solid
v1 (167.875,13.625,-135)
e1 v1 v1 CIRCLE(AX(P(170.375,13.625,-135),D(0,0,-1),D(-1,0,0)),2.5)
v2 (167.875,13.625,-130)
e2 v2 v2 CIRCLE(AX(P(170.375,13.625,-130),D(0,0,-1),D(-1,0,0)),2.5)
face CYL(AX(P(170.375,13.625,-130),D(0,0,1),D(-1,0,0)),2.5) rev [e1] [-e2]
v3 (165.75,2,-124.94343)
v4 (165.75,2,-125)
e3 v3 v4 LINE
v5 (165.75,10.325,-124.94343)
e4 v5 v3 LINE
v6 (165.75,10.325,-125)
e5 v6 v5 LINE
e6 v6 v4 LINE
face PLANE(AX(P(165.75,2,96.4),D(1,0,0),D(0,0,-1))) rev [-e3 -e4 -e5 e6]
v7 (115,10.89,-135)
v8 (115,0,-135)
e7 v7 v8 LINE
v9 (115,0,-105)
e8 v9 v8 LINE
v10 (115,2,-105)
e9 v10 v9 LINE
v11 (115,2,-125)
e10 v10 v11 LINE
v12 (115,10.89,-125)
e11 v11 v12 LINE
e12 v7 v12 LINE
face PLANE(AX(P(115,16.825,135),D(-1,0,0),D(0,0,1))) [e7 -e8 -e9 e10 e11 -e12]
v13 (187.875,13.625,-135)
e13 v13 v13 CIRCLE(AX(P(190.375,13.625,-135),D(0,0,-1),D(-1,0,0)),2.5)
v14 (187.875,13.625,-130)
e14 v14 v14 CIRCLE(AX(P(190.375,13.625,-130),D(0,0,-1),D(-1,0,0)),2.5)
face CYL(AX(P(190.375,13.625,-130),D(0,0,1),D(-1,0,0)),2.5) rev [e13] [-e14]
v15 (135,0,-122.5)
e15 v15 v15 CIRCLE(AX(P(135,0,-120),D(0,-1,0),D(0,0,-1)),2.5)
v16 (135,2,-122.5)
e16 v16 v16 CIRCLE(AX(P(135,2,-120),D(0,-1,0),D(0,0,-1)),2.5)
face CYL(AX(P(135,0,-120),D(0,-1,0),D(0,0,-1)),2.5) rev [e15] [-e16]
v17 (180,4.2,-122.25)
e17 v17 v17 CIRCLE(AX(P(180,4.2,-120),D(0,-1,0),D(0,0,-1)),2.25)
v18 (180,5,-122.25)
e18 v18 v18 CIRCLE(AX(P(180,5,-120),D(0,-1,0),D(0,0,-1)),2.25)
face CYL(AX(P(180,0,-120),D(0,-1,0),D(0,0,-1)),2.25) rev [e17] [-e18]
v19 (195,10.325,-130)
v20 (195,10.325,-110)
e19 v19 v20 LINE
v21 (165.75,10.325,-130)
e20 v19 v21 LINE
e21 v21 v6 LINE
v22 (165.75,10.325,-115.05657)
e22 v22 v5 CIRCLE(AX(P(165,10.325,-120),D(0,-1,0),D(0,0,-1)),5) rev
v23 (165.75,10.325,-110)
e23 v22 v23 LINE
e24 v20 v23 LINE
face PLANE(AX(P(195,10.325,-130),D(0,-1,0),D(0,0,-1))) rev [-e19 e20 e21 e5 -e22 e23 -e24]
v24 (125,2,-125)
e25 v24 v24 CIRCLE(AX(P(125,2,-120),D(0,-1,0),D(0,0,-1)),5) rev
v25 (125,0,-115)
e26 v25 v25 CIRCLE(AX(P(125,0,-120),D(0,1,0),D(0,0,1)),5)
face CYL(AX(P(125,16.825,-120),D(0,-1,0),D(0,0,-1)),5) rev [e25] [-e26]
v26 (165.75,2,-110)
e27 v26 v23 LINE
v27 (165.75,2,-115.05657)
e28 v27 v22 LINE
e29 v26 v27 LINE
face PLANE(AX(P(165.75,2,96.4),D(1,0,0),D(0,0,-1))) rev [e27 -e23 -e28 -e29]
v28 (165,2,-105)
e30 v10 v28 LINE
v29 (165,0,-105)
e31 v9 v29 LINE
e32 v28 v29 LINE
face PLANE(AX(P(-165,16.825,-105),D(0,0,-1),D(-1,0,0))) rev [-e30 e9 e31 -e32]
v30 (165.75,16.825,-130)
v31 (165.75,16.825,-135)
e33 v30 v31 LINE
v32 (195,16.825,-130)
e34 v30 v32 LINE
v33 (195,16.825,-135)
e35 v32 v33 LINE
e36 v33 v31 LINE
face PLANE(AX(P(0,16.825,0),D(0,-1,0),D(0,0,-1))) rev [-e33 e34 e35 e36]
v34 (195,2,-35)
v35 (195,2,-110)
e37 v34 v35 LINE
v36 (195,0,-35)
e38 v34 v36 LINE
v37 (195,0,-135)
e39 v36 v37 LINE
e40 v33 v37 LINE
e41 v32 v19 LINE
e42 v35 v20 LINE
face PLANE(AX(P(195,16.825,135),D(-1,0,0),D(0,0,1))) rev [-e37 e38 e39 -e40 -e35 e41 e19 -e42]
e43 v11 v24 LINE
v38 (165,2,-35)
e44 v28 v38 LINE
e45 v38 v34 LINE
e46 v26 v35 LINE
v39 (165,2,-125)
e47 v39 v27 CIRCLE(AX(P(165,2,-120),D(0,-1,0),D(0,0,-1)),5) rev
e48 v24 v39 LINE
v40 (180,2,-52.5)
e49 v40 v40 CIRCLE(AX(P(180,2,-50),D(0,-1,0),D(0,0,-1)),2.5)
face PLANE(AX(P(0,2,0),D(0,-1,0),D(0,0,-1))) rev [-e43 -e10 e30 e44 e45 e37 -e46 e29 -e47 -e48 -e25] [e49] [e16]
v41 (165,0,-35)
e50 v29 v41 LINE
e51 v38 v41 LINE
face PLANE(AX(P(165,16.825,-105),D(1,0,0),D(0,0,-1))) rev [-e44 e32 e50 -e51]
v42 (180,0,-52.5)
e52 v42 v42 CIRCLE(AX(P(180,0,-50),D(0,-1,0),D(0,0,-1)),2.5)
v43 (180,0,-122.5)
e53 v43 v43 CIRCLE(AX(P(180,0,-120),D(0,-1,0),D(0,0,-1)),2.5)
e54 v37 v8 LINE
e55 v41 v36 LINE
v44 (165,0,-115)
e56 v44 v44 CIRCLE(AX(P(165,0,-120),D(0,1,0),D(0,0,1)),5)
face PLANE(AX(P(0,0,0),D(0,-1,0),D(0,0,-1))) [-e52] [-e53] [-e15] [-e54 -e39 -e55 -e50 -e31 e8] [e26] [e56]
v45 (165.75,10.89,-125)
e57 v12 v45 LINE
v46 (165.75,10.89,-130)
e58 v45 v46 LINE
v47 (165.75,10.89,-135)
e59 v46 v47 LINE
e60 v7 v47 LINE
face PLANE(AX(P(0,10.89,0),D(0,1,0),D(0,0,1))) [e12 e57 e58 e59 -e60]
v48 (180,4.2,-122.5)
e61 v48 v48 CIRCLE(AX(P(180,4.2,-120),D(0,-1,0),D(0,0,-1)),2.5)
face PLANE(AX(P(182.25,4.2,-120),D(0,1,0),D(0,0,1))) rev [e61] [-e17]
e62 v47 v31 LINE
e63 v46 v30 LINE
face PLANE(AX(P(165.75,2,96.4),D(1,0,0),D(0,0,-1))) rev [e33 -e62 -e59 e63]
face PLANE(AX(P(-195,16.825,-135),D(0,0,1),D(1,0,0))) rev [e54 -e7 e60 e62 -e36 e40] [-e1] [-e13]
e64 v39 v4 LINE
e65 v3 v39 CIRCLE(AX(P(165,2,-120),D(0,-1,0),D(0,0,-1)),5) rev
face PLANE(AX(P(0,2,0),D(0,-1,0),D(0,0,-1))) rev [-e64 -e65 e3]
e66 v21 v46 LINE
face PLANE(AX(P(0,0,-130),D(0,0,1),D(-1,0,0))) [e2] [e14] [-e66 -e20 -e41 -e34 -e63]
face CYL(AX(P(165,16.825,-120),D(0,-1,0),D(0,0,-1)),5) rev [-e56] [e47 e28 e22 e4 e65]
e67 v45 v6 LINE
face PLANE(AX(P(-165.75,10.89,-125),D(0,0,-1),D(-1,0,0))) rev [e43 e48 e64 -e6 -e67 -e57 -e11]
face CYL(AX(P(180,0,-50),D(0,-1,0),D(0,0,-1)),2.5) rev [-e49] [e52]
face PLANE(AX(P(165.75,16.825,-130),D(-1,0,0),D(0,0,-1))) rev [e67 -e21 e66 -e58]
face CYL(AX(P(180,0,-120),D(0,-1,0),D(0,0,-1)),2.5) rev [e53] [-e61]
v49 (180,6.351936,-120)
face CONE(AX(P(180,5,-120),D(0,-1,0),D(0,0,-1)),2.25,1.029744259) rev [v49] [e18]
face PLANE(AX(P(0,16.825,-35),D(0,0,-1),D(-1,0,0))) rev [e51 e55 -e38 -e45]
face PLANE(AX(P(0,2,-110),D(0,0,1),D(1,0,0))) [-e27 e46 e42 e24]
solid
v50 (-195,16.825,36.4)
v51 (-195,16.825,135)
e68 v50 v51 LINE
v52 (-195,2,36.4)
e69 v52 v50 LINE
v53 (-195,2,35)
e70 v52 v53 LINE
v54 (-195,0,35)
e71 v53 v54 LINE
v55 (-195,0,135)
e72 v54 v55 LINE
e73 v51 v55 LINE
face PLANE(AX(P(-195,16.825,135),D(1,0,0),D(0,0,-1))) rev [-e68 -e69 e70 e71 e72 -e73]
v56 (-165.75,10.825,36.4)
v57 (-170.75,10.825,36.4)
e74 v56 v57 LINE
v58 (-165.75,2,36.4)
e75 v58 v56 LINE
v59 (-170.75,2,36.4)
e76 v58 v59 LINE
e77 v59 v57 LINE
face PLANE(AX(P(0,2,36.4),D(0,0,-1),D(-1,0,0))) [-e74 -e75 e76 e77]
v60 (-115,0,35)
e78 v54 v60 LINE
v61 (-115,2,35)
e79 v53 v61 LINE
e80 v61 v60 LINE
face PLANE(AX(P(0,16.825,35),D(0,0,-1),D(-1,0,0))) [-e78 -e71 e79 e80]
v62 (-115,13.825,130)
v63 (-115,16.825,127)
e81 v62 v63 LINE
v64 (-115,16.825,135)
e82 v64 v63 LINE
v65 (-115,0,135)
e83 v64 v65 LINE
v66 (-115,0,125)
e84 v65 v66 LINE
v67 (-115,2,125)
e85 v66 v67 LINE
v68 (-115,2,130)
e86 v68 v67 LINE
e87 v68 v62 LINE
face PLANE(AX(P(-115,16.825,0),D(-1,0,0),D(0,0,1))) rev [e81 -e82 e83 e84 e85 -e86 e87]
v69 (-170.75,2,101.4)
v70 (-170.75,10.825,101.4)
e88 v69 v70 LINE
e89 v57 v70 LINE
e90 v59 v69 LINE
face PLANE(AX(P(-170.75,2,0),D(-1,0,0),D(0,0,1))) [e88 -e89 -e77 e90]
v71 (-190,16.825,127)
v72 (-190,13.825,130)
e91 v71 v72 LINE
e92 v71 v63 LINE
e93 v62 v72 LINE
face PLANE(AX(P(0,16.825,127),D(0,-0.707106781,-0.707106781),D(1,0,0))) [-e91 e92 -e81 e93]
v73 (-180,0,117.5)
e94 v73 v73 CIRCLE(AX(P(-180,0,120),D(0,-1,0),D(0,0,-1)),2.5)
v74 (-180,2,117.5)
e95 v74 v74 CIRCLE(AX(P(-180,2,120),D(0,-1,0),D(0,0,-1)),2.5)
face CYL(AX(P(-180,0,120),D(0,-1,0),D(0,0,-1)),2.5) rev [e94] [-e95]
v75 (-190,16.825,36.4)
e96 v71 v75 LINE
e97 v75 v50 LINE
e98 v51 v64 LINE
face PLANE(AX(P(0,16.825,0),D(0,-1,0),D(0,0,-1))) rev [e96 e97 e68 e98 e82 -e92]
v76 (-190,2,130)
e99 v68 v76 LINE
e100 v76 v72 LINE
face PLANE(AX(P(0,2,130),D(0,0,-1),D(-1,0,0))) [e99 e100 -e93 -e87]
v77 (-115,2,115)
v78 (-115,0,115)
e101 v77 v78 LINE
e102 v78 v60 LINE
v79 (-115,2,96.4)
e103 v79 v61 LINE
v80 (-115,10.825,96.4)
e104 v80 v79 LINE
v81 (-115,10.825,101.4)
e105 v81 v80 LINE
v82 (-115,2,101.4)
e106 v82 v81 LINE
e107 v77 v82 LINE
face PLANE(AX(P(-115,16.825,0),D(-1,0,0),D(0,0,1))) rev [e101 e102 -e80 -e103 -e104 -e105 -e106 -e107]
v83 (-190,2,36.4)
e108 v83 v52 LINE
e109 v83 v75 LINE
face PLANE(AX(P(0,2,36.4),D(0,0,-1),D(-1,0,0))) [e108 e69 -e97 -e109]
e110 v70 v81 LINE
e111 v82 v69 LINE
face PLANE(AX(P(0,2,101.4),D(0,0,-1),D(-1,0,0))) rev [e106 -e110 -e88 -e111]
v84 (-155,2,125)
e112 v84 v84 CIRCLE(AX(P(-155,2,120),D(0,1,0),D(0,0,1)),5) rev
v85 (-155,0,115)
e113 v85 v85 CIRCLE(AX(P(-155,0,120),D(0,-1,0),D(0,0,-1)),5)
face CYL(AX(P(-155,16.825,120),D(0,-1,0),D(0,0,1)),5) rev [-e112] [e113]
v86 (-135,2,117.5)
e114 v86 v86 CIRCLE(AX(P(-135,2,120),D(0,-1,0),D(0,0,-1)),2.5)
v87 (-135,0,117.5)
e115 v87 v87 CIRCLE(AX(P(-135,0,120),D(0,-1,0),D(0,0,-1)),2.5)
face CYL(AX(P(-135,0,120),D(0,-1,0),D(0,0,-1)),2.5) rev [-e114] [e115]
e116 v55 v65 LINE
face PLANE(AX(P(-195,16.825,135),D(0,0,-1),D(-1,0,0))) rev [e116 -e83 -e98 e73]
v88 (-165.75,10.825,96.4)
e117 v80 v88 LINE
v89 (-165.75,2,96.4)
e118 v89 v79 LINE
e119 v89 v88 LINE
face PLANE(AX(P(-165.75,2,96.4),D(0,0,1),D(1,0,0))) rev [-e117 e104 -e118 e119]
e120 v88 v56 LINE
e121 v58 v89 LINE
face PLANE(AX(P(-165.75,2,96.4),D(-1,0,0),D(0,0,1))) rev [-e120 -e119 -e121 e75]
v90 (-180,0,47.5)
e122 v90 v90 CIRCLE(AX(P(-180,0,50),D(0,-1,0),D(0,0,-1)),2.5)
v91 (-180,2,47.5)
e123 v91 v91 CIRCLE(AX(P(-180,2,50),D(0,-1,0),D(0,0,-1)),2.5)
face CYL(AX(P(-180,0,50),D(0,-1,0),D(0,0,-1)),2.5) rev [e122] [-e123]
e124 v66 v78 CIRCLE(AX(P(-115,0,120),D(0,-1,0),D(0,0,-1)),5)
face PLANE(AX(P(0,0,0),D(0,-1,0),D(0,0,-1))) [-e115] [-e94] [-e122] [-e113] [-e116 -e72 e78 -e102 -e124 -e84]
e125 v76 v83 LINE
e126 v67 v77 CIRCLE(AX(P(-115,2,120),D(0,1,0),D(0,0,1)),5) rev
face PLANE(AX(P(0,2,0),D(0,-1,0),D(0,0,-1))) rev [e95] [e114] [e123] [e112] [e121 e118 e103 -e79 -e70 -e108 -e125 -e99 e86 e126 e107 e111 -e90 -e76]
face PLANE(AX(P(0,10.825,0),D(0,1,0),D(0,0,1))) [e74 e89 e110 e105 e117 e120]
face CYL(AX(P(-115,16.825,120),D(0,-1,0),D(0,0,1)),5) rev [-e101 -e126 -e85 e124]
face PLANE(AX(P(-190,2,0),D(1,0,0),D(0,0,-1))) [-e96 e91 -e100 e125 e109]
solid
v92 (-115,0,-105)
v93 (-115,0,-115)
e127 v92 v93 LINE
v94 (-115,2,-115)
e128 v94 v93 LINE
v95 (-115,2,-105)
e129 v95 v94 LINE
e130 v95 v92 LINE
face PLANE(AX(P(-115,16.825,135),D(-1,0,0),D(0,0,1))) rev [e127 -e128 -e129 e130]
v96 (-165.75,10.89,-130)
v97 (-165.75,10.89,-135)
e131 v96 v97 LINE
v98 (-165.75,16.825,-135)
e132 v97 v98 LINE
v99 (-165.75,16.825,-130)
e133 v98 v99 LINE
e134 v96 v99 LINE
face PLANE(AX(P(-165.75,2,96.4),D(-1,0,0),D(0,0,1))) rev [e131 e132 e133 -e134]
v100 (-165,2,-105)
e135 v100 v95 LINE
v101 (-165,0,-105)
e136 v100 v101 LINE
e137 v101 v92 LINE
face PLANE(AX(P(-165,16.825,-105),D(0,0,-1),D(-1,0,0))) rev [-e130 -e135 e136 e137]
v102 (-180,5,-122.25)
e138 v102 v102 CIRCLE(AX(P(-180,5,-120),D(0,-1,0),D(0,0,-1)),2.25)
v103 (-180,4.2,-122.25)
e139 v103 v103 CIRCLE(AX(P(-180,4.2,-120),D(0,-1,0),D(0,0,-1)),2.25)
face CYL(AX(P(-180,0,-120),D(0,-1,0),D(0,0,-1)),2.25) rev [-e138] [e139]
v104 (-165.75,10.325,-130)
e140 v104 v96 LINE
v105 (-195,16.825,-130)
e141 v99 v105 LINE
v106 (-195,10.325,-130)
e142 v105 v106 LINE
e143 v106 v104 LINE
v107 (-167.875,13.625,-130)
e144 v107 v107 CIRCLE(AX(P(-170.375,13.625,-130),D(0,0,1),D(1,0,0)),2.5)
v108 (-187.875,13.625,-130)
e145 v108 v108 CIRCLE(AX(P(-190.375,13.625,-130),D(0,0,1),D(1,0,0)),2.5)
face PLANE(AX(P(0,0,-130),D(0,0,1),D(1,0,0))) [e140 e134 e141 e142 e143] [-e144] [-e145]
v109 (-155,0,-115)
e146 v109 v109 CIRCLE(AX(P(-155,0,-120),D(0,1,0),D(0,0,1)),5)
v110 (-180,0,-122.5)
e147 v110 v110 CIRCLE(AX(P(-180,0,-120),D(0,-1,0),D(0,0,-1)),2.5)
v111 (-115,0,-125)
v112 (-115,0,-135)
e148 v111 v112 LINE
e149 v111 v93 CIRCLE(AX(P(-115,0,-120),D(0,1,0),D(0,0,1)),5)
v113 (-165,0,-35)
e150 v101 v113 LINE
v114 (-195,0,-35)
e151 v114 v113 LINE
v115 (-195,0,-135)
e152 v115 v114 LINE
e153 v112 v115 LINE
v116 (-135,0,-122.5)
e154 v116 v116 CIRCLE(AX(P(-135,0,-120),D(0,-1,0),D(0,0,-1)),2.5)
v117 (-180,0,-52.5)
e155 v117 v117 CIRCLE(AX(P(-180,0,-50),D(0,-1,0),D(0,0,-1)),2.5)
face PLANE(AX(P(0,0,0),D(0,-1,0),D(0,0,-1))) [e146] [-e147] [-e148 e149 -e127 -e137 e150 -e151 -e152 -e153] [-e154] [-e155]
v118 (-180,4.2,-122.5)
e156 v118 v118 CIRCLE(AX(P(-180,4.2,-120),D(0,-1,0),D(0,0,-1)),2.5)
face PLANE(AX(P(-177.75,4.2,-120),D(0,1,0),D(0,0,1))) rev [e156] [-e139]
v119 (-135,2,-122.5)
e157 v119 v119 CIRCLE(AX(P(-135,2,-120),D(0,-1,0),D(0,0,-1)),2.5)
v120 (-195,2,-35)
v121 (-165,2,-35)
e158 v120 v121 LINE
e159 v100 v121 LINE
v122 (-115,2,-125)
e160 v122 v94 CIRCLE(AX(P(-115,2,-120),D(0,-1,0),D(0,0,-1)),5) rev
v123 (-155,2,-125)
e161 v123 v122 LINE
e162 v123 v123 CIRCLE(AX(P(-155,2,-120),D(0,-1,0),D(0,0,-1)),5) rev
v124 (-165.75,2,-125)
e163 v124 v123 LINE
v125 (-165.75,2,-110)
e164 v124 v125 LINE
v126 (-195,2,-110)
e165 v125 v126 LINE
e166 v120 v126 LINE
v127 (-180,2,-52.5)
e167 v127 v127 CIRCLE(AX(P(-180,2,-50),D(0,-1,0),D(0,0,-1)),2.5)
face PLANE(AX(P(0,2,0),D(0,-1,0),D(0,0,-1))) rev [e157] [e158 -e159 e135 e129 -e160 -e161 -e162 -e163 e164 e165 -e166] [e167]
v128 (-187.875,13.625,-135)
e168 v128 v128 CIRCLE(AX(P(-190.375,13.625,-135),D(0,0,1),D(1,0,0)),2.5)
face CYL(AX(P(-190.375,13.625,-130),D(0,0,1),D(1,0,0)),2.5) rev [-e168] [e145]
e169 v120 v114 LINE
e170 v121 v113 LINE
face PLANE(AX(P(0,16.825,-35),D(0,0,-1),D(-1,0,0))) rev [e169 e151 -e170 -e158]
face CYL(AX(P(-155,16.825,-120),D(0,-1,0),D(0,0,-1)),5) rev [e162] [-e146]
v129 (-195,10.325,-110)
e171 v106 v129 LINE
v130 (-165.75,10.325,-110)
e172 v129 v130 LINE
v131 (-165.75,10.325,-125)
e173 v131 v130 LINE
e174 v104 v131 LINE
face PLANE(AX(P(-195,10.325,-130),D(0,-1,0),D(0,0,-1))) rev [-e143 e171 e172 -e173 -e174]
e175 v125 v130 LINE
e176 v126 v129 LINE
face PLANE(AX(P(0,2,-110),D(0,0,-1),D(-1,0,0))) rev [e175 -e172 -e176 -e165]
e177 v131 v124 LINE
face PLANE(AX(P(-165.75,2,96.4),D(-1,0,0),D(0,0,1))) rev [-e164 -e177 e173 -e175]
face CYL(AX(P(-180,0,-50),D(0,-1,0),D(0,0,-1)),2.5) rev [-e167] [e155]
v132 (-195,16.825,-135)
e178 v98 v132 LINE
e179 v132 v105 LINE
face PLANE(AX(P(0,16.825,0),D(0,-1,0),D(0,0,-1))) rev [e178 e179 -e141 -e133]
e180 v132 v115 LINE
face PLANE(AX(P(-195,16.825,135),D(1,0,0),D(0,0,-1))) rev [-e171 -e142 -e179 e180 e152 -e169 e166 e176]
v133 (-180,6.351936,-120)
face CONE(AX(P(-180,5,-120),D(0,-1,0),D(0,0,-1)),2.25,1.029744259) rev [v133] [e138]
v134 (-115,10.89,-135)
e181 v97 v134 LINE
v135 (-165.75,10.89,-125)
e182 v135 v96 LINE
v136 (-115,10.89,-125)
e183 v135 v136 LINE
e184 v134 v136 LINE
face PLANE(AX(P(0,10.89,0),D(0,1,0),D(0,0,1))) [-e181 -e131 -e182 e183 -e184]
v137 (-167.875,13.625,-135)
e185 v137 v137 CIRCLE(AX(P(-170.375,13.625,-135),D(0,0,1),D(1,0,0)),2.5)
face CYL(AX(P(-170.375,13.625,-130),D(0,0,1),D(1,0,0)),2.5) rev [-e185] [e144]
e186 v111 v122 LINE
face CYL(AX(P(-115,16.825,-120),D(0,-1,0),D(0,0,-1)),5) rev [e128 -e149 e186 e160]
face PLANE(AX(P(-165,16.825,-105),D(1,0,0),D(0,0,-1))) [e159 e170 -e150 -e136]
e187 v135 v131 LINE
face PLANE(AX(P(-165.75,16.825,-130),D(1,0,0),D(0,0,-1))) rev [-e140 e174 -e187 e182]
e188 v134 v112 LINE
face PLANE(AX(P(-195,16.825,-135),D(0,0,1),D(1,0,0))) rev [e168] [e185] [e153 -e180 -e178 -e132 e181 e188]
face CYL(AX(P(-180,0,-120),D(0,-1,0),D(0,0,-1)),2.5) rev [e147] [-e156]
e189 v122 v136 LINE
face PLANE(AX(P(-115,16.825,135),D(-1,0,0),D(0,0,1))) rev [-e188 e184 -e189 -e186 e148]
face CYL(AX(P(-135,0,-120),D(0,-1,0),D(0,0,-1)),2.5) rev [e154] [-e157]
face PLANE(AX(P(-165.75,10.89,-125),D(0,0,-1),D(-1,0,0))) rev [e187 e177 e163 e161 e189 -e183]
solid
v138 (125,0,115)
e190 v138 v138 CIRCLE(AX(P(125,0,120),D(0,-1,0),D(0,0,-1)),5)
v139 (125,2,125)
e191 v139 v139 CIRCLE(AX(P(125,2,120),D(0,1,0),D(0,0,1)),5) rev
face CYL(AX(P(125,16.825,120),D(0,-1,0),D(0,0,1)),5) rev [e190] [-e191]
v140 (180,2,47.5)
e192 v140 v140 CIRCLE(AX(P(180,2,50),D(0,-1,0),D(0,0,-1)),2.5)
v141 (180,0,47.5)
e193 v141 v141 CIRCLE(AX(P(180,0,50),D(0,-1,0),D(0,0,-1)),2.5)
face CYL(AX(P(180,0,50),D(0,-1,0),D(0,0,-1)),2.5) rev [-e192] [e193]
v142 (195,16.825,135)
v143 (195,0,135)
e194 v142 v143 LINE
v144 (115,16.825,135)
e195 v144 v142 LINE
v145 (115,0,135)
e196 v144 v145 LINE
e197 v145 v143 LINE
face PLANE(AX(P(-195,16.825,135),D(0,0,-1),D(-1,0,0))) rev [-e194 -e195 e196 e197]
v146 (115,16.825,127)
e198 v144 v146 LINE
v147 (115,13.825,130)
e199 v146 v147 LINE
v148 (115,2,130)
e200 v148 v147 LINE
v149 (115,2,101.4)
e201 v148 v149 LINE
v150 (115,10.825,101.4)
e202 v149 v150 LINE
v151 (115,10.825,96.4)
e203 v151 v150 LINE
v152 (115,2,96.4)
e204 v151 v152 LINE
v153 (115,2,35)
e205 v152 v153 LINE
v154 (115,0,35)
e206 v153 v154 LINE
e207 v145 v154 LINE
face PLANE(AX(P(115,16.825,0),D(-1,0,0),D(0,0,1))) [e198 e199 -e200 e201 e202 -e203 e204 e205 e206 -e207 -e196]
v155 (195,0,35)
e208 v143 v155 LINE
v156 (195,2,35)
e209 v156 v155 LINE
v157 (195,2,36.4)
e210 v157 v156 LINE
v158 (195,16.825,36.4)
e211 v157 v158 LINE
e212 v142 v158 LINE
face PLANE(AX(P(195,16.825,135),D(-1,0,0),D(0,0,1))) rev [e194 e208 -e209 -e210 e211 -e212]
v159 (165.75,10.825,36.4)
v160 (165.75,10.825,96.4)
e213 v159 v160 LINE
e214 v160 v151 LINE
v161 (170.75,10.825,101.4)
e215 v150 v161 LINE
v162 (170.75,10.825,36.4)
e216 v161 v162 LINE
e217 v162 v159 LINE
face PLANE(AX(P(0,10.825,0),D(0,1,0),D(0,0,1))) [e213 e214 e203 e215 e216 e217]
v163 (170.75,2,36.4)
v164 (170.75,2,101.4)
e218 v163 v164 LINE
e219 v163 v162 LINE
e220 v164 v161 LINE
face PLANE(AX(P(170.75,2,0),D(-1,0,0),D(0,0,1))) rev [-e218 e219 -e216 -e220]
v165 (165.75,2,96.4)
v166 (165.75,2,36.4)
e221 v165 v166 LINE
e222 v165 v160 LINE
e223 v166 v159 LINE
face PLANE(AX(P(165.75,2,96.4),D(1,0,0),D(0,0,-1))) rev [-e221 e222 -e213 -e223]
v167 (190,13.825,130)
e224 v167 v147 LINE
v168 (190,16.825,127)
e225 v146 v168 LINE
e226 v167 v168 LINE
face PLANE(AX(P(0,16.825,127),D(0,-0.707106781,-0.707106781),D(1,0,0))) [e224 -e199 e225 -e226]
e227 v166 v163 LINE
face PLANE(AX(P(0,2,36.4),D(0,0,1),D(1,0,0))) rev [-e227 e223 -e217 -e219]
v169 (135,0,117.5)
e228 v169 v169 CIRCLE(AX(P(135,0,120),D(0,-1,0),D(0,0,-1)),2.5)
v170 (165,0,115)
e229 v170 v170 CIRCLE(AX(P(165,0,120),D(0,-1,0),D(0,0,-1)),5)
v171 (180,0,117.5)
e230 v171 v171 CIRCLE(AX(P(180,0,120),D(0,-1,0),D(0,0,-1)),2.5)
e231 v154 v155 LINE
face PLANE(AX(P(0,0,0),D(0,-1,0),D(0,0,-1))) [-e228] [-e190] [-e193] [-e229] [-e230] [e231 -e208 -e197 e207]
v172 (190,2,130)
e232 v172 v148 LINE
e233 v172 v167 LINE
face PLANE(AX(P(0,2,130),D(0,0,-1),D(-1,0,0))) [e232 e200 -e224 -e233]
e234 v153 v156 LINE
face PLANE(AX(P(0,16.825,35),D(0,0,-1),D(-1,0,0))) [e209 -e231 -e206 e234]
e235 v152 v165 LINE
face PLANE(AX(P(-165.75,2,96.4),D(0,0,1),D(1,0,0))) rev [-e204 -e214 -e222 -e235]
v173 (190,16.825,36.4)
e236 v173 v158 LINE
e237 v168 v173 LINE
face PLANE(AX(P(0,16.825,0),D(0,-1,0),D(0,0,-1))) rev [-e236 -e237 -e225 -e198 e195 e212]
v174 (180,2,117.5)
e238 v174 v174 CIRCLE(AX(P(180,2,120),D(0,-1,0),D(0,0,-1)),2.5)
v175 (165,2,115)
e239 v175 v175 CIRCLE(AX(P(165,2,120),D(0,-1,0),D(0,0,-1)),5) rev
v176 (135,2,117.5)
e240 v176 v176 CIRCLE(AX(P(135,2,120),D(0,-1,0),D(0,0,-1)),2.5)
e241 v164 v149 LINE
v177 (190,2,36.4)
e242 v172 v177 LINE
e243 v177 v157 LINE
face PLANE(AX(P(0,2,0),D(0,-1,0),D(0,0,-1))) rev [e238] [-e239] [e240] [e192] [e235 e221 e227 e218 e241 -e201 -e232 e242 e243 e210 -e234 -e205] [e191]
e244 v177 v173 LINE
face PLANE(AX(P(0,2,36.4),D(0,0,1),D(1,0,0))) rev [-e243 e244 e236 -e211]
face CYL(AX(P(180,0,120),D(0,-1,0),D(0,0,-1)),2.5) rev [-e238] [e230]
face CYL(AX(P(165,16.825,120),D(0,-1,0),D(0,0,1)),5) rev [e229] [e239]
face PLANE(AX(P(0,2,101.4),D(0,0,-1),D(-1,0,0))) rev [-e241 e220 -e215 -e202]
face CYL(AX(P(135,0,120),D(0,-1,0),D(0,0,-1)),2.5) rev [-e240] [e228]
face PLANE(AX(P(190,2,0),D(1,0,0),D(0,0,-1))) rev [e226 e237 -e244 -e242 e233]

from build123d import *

# Parameters (mm, degrees)
SKETCH1_W                              = 390
SKETCH1_H                              = 270
BOSS_EXTRUDE1_DEPTH                    = 16.825
SKETCH2_W                              = 331.5
SKETCH2_H                              = 231.4
CUT_EXTRUDE1_DEPTH                     = 14.825
SKETCH3_W                              = 170.75
SKETCH3_H                              = 28.6
CUT_EXTRUDE2_DEPTH                     = 14.825
SKETCH4_W                              = 331.5
SKETCH4_H                              = 10
BOSS_EXTRUDE2_DEPTH                    = 8.89
CBORE_FOR_M5_HEX_HEAD_BOLT1_AT_2_COUNT = 2
CBORE_FOR_M5_HEX_HEAD_BOLT1_AT_2_PITCH = 45
CBORE_FOR_M5_HEX_HEAD_BOLT1_AT_3_COUNT = 2
CBORE_FOR_M5_HEX_HEAD_BOLT1_AT_3_PITCH = 70
SKETCH18_W                             = 230
SKETCH18_H                             = 270
SKETCH18_W_2                           = 390
SKETCH18_H_2                           = 70
SKETCH18_W_3                           = 330
CUT_EXTRUDE5_DEPTH                     = 238.766861915
SKETCH23_W                             = 29.25
SKETCH23_H                             = 6.5
CUT_EXTRUDE6_DEPTH                     = 20
SKETCH25_W                             = 2.5
SKETCH25_H                             = 5
F_1_0MM_DOWEL_HOLE1_AT_2_COUNT         = 2
F_1_0MM_DOWEL_HOLE1_AT_2_PITCH         = 20
CUT_EXTRUDE7_DEPTH                     = 6
MIRROR5_COPY_1_SKETCH_W                = 2.5
MIRROR5_COPY_1_SKETCH_H                = 5
SKETCH27_R                             = 5
CUT_EXTRUDE8_DEPTH                     = 238.766861915
SKETCH28_W                             = 75
SKETCH28_H                             = 3
BOSS_EXTRUDE3_DEPTH                    = 3
CHAMFER1_SIZE                          = 3
CHAMFER2_SIZE                          = 3


with BuildPart() as part:
    # Sketch1 → Boss-Extrude1 (new body)
    with BuildSketch(Plane(origin=(0, 0, 0), x_dir=(1, 0, 0), z_dir=(0, 1, 0))):
        Rectangle(SKETCH1_W, SKETCH1_H)
    extrude(amount=BOSS_EXTRUDE1_DEPTH)

    # Sketch2 → Cut-Extrude1 (cut)
    with BuildSketch(Plane(origin=(0, 16.825, 0), x_dir=(1, 0, 0), z_dir=(0, 1, 0))):
        with Locations((0, 19.3)):
            Rectangle(SKETCH2_W, SKETCH2_H)
    extrude(amount=-CUT_EXTRUDE1_DEPTH, mode=Mode.SUBTRACT)

    # Sketch3 → Cut-Extrude2 (cut)
    with BuildSketch(Plane(origin=(0, 16.825, 0), x_dir=(1, 0, 0), z_dir=(0, 1, 0))):
        with Locations((85.375, -115.7)):
            Rectangle(SKETCH3_W, SKETCH3_H)
        Polygon((190, -36.4), (170.75, -36.4), (170.75, -101.4), (170.75, -130), (190, -130), align=None)
        Polygon((165.75, -36.4), (170.75, -36.4), (190, -36.4), (195, -36.4), (195, 110), (165.75, 110), align=None)
    cut_extrude2 = extrude(amount=-CUT_EXTRUDE2_DEPTH, mode=Mode.SUBTRACT)

    # Mirror1: Cut-Extrude2 across plane
    add(cut_extrude2.mirror(Plane(origin=(0, 0, 0), x_dir=(0, 0, 1), z_dir=(1, 0, 0))), mode=Mode.SUBTRACT)

    # Sketch4 → Boss-Extrude2 (add)
    with BuildSketch(Plane(origin=(0, 2, 0), x_dir=(1, 0, 0), z_dir=(0, 1, 0))):
        with Locations((0, 130)):
            Rectangle(SKETCH4_W, SKETCH4_H)
    extrude(amount=BOSS_EXTRUDE2_DEPTH)

    # Sketch22 → CBORE for M5 Hex Head Bolt1 (revolve, cut)
    with BuildSketch(Plane(origin=(180, 0, -120), x_dir=(0, 0, -1), z_dir=(1, 0, 0))):
        Polygon((0, 0), (0, 6.351936393), (2.25, 5), (2.25, 4.2), (2.5, 4.2), (2.5, 0), align=None)
    cbore_for_m5_hex_head_bolt1 = revolve(axis=Axis((180, -6.35, -120), (0, 1, 0)), mode=Mode.SUBTRACT)

    # CBORE for M5 Hex Head Bolt1 at 2: CBORE for M5 Hex Head Bolt1 ×2
    with Locations(*[(-i * CBORE_FOR_M5_HEX_HEAD_BOLT1_AT_2_PITCH, 0, 0) for i in range(1, CBORE_FOR_M5_HEX_HEAD_BOLT1_AT_2_COUNT)]):
        add(cbore_for_m5_hex_head_bolt1, mode=Mode.SUBTRACT)

    # CBORE for M5 Hex Head Bolt1 at 3: CBORE for M5 Hex Head Bolt1 ×2
    with Locations(*[(0, 0, i * CBORE_FOR_M5_HEX_HEAD_BOLT1_AT_3_PITCH) for i in range(1, CBORE_FOR_M5_HEX_HEAD_BOLT1_AT_3_COUNT)]):
        add(cbore_for_m5_hex_head_bolt1, mode=Mode.SUBTRACT)

    # Mirror3: CBORE for M5 Hex Head Bolt1 across plane
    add(cbore_for_m5_hex_head_bolt1.mirror(Plane(origin=(0, 0, 0), x_dir=(0, 0, 1), z_dir=(1, 0, 0))), mode=Mode.SUBTRACT)

    # Mirror3 copy 1 sketch → Mirror3 copy 1 (revolve, cut)
    with BuildSketch(Plane(origin=(-135, 0, -120), x_dir=(0, 0, -1), z_dir=(-1, 0, 0))):
        Polygon((0, 0), (0, -6.351936393), (2.25, -5), (2.25, -4.2), (2.5, -4.2), (2.5, 0), align=None)
    revolve(axis=Axis((-135, -6.35, -120), (0, -1, 0)), mode=Mode.SUBTRACT)

    # Mirror3 copy 2 sketch → Mirror3 copy 2 (revolve, cut)
    with BuildSketch(Plane(origin=(-180, 0, -50), x_dir=(0, 0, -1), z_dir=(-1, 0, 0))):
        Polygon((0, 0), (0, -6.351936393), (2.25, -5), (2.25, -4.2), (2.5, -4.2), (2.5, 0), align=None)
    revolve(axis=Axis((-180, -6.35, -50), (0, -1, 0)), mode=Mode.SUBTRACT)

    # Mirror3 at the second plane: CBORE for M5 Hex Head Bolt1 across plane
    add(cbore_for_m5_hex_head_bolt1.mirror(Plane.XY), mode=Mode.SUBTRACT)

    # Mirror3 at the second plane copy 1 sketc → Mirror3 at the second plane copy 1 (revolve, cut)
    with BuildSketch(Plane(origin=(135, 0, 120), x_dir=(0, 0, 1), z_dir=(1, 0, 0))):
        Polygon((0, 0), (0, -6.351936393), (2.25, -5), (2.25, -4.2), (2.5, -4.2), (2.5, 0), align=None)
    revolve(axis=Axis((135, -6.35, 120), (0, -1, 0)), mode=Mode.SUBTRACT)

    # Mirror3 at the second plane copy 2 sketc → Mirror3 at the second plane copy 2 (revolve, cut)
    with BuildSketch(Plane(origin=(180, 0, 50), x_dir=(0, 0, 1), z_dir=(1, 0, 0))):
        Polygon((0, 0), (0, -6.351936393), (2.25, -5), (2.25, -4.2), (2.5, -4.2), (2.5, 0), align=None)
    revolve(axis=Axis((180, -6.35, 50), (0, -1, 0)), mode=Mode.SUBTRACT)

    # Mirror3 at the second plane copy 3 sketc → Mirror3 at the second plane copy 3 (revolve, cut)
    with BuildSketch(Plane(origin=(-180, 0, 120), x_dir=(0, 0, 1), z_dir=(-1, 0, 0))):
        Polygon((0, 0), (0, 6.351936393), (2.25, 5), (2.25, 4.2), (2.5, 4.2), (2.5, 0), align=None)
    revolve(axis=Axis((-180, -6.35, 120), (0, 1, 0)), mode=Mode.SUBTRACT)

    # Mirror3 at the second plane copy 4 sketc → Mirror3 at the second plane copy 4 (revolve, cut)
    with BuildSketch(Plane(origin=(-135, 0, 120), x_dir=(0, 0, 1), z_dir=(-1, 0, 0))):
        Polygon((0, 0), (0, 6.351936393), (2.25, 5), (2.25, 4.2), (2.5, 4.2), (2.5, 0), align=None)
    revolve(axis=Axis((-135, -6.35, 120), (0, 1, 0)), mode=Mode.SUBTRACT)

    # Mirror3 at the second plane copy 5 sketc → Mirror3 at the second plane copy 5 (revolve, cut)
    with BuildSketch(Plane(origin=(-180, 0, 50), x_dir=(0, 0, 1), z_dir=(-1, 0, 0))):
        Polygon((0, 0), (0, 6.351936393), (2.25, 5), (2.25, 4.2), (2.5, 4.2), (2.5, 0), align=None)
    revolve(axis=Axis((-180, -6.35, 50), (0, 1, 0)), mode=Mode.SUBTRACT)

    # Sketch18 → Cut-Extrude5 (cut, through all)
    with BuildSketch(Plane.XZ):
        Rectangle(SKETCH18_W, SKETCH18_H)
        Rectangle(SKETCH18_W_2, SKETCH18_H_2)
        with Locations((0, -70)):
            Rectangle(SKETCH18_W_3, SKETCH18_H_2)
    extrude(amount=-CUT_EXTRUDE5_DEPTH, mode=Mode.SUBTRACT)


with BuildPart() as cut_extrude5_piece_1:
    # of the separate pieces the step leaves, piece 1, a body of its own (cut_extrude5_pieces)
    add(part.part.solids().sort_by_distance((-195, 0, 135))[0])


with BuildPart() as cut_extrude5_piece_2:
    # of the separate pieces the step leaves, piece 2, a body of its own (cut_extrude5_pieces)
    add(part.part.solids().sort_by_distance((115, 0, 135))[0])


with BuildPart() as cut_extrude5_piece_3:
    # of the separate pieces the step leaves, piece 3, a body of its own (cut_extrude5_pieces)
    add(part.part.solids().sort_by_distance((165, 0, -35))[0])


with BuildPart() as cut_extrude5_piece_4:
    # of the separate pieces the step leaves, piece 4, a body of its own (cut_extrude5_pieces)
    add(part.part.solids().sort_by_distance((-195, 0, -135))[0])

    # Sketch23 → Cut-Extrude6 (cut)
    with BuildSketch(Plane.XY.offset(-110)):
        with Locations((-180.375, 13.575)):
            Rectangle(SKETCH23_W, SKETCH23_H)
    cut_extrude6 = extrude(amount=-CUT_EXTRUDE6_DEPTH, mode=Mode.SUBTRACT)

    # Sketch25 → Ø1.0mm Dowel Hole1 (revolve, cut)
    with BuildSketch(Plane(origin=(-190.375, 13.625, -130), x_dir=(0, -1, 0), z_dir=(1, 0, 0))):
        with Locations((1.25, 2.5)):
            Rectangle(SKETCH25_W, SKETCH25_H)
    f_1_0mm_dowel_hole1 = revolve(axis=Axis((-190.375, 13.625, -123.65), (0, 0, -1)), mode=Mode.SUBTRACT)

    # Ø1.0mm Dowel Hole1 at 2: Ø1.0mm Dowel Hole1 ×2
    with Locations(*[(i * F_1_0MM_DOWEL_HOLE1_AT_2_PITCH, 0, 0) for i in range(1, F_1_0MM_DOWEL_HOLE1_AT_2_COUNT)]):
        add(f_1_0mm_dowel_hole1, mode=Mode.SUBTRACT)


with BuildPart() as cut_extrude7_tool:
    # Sketch26 → Cut-Extrude7 (new body)
    with BuildSketch(Plane(origin=(0, 16.825, 0), x_dir=(1, 0, 0), z_dir=(0, 1, 0))):
        Polygon((115, -96.4), (115, -101.4), (170.75, -101.4), (170.75, -36.4), (165.75, -36.4), (165.75, -96.4), align=None)
        Polygon((-170.75, -36.4), (-170.75, -101.4), (-115, -101.4), (-115, -96.4), (-165.75, -96.4), (-165.75, -36.4), align=None)
    extrude(amount=-CUT_EXTRUDE7_DEPTH)


with BuildPart() as cut_extrude5_piece_1_1:
    add(cut_extrude5_piece_1.part)

    # Cut-Extrude7: cut by cut_extrude7_tool
    add(cut_extrude7_tool.part, mode=Mode.SUBTRACT)


with BuildPart() as cut_extrude5_piece_2_1:
    add(cut_extrude5_piece_2.part)

    # Cut-Extrude7: cut by cut_extrude7_tool
    add(cut_extrude7_tool.part, mode=Mode.SUBTRACT)


with BuildPart() as cut_extrude5_piece_3_1:
    add(cut_extrude5_piece_3.part)

    # Mirror5: Cut-Extrude6, Ø1.0mm Dowel Hole1 across plane
    add(cut_extrude6.mirror(Plane(origin=(0, 0, 0), x_dir=(0, 0, 1), z_dir=(1, 0, 0))), mode=Mode.SUBTRACT)
    add(f_1_0mm_dowel_hole1.mirror(Plane(origin=(0, 0, 0), x_dir=(0, 0, 1), z_dir=(1, 0, 0))), mode=Mode.SUBTRACT)

    # Mirror5 copy 1 sketch → Mirror5 copy 1 (revolve, cut)
    with BuildSketch(Plane(origin=(170.375, 13.625, -130), x_dir=(0, -1, 0), z_dir=(-1, 0, 0))):
        with Locations((1.25, -2.5)):
            Rectangle(MIRROR5_COPY_1_SKETCH_W, MIRROR5_COPY_1_SKETCH_H)
    revolve(axis=Axis((170.375, 13.625, -123.65), (0, 0, 1)), mode=Mode.SUBTRACT)


with BuildPart() as cut_extrude8_tool:
    # Sketch27 → Cut-Extrude8 (new, through all)
    with BuildSketch(Plane(origin=(0, 0, 0), x_dir=(1, 0, 0), z_dir=(0, 1, 0))):
        with Locations(Location((165, 120, 0), (0, 0, 90))):
            Circle(SKETCH27_R)
        with Locations(Location((125, 120, 0), (0, 0, 90))):
            Circle(SKETCH27_R)
        with Locations(Location((-155, 120, 0), (0, 0, 90))):
            Circle(SKETCH27_R)
        with Locations((-115, 120)):
            Circle(SKETCH27_R)
    cut_extrude8 = extrude(amount=CUT_EXTRUDE8_DEPTH)


with BuildPart() as cut_extrude5_piece_3_2:
    add(cut_extrude5_piece_3_1.part)

    # Cut-Extrude8: cut by cut_extrude8_tool
    add(cut_extrude8_tool.part, mode=Mode.SUBTRACT)


with BuildPart() as cut_extrude5_piece_4_1:
    add(cut_extrude5_piece_4.part)

    # Cut-Extrude8: cut by cut_extrude8_tool
    add(cut_extrude8_tool.part, mode=Mode.SUBTRACT)


with BuildPart() as mirror6_tool:
    # Mirror6: Cut-Extrude8 across plane
    add(cut_extrude8.mirror(Plane.XY))


with BuildPart() as cut_extrude5_piece_1_2:
    add(cut_extrude5_piece_1_1.part)

    # Mirror6: cut by mirror6_tool
    add(mirror6_tool.part, mode=Mode.SUBTRACT)



with BuildPart() as cut_extrude5_piece_2_2:
    add(cut_extrude5_piece_2_1.part)

    # Mirror6: cut by mirror6_tool
    add(mirror6_tool.part, mode=Mode.SUBTRACT)


with BuildPart() as cut_extrude5_piece_1_3:
    add(cut_extrude5_piece_1_2.part)

    add(cut_extrude5_piece_2_2.part)  # Boss-Extrude3 merges Cut-Extrude5 piece 2
    # Sketch28 → Boss-Extrude3 (add)
    with BuildSketch(Plane(origin=(0, 0, 130), x_dir=(-1, 0, 0), z_dir=(0, 0, -1))):
        with Locations((152.5, 15.325)):
            Rectangle(SKETCH28_W, SKETCH28_H)
        with Locations((-152.5, 15.325)):
            Rectangle(SKETCH28_W, SKETCH28_H)
    extrude(amount=BOSS_EXTRUDE3_DEPTH)

    # Chamfer1
    chamfer1_edges = [cut_extrude5_piece_1_3.edges().sort_by_distance(p)[0] for p in [
        (152.5, 13.825, 127),
    ]]
    chamfer(chamfer1_edges, length=CHAMFER1_SIZE - 0.0001)  # a hair under: the kernel refuses the full size

    # Chamfer2
    chamfer2_edges = [cut_extrude5_piece_1_3.edges().sort_by_distance(p)[0] for p in [
        (-152.5, 13.825, 127),
    ]]
    chamfer(chamfer2_edges, length=CHAMFER2_SIZE - 0.0001)  # a hair under: the kernel refuses the full size


solid = Compound([cut_extrude5_piece_3_2.part, cut_extrude5_piece_4_1.part, cut_extrude5_piece_1_3.part])
